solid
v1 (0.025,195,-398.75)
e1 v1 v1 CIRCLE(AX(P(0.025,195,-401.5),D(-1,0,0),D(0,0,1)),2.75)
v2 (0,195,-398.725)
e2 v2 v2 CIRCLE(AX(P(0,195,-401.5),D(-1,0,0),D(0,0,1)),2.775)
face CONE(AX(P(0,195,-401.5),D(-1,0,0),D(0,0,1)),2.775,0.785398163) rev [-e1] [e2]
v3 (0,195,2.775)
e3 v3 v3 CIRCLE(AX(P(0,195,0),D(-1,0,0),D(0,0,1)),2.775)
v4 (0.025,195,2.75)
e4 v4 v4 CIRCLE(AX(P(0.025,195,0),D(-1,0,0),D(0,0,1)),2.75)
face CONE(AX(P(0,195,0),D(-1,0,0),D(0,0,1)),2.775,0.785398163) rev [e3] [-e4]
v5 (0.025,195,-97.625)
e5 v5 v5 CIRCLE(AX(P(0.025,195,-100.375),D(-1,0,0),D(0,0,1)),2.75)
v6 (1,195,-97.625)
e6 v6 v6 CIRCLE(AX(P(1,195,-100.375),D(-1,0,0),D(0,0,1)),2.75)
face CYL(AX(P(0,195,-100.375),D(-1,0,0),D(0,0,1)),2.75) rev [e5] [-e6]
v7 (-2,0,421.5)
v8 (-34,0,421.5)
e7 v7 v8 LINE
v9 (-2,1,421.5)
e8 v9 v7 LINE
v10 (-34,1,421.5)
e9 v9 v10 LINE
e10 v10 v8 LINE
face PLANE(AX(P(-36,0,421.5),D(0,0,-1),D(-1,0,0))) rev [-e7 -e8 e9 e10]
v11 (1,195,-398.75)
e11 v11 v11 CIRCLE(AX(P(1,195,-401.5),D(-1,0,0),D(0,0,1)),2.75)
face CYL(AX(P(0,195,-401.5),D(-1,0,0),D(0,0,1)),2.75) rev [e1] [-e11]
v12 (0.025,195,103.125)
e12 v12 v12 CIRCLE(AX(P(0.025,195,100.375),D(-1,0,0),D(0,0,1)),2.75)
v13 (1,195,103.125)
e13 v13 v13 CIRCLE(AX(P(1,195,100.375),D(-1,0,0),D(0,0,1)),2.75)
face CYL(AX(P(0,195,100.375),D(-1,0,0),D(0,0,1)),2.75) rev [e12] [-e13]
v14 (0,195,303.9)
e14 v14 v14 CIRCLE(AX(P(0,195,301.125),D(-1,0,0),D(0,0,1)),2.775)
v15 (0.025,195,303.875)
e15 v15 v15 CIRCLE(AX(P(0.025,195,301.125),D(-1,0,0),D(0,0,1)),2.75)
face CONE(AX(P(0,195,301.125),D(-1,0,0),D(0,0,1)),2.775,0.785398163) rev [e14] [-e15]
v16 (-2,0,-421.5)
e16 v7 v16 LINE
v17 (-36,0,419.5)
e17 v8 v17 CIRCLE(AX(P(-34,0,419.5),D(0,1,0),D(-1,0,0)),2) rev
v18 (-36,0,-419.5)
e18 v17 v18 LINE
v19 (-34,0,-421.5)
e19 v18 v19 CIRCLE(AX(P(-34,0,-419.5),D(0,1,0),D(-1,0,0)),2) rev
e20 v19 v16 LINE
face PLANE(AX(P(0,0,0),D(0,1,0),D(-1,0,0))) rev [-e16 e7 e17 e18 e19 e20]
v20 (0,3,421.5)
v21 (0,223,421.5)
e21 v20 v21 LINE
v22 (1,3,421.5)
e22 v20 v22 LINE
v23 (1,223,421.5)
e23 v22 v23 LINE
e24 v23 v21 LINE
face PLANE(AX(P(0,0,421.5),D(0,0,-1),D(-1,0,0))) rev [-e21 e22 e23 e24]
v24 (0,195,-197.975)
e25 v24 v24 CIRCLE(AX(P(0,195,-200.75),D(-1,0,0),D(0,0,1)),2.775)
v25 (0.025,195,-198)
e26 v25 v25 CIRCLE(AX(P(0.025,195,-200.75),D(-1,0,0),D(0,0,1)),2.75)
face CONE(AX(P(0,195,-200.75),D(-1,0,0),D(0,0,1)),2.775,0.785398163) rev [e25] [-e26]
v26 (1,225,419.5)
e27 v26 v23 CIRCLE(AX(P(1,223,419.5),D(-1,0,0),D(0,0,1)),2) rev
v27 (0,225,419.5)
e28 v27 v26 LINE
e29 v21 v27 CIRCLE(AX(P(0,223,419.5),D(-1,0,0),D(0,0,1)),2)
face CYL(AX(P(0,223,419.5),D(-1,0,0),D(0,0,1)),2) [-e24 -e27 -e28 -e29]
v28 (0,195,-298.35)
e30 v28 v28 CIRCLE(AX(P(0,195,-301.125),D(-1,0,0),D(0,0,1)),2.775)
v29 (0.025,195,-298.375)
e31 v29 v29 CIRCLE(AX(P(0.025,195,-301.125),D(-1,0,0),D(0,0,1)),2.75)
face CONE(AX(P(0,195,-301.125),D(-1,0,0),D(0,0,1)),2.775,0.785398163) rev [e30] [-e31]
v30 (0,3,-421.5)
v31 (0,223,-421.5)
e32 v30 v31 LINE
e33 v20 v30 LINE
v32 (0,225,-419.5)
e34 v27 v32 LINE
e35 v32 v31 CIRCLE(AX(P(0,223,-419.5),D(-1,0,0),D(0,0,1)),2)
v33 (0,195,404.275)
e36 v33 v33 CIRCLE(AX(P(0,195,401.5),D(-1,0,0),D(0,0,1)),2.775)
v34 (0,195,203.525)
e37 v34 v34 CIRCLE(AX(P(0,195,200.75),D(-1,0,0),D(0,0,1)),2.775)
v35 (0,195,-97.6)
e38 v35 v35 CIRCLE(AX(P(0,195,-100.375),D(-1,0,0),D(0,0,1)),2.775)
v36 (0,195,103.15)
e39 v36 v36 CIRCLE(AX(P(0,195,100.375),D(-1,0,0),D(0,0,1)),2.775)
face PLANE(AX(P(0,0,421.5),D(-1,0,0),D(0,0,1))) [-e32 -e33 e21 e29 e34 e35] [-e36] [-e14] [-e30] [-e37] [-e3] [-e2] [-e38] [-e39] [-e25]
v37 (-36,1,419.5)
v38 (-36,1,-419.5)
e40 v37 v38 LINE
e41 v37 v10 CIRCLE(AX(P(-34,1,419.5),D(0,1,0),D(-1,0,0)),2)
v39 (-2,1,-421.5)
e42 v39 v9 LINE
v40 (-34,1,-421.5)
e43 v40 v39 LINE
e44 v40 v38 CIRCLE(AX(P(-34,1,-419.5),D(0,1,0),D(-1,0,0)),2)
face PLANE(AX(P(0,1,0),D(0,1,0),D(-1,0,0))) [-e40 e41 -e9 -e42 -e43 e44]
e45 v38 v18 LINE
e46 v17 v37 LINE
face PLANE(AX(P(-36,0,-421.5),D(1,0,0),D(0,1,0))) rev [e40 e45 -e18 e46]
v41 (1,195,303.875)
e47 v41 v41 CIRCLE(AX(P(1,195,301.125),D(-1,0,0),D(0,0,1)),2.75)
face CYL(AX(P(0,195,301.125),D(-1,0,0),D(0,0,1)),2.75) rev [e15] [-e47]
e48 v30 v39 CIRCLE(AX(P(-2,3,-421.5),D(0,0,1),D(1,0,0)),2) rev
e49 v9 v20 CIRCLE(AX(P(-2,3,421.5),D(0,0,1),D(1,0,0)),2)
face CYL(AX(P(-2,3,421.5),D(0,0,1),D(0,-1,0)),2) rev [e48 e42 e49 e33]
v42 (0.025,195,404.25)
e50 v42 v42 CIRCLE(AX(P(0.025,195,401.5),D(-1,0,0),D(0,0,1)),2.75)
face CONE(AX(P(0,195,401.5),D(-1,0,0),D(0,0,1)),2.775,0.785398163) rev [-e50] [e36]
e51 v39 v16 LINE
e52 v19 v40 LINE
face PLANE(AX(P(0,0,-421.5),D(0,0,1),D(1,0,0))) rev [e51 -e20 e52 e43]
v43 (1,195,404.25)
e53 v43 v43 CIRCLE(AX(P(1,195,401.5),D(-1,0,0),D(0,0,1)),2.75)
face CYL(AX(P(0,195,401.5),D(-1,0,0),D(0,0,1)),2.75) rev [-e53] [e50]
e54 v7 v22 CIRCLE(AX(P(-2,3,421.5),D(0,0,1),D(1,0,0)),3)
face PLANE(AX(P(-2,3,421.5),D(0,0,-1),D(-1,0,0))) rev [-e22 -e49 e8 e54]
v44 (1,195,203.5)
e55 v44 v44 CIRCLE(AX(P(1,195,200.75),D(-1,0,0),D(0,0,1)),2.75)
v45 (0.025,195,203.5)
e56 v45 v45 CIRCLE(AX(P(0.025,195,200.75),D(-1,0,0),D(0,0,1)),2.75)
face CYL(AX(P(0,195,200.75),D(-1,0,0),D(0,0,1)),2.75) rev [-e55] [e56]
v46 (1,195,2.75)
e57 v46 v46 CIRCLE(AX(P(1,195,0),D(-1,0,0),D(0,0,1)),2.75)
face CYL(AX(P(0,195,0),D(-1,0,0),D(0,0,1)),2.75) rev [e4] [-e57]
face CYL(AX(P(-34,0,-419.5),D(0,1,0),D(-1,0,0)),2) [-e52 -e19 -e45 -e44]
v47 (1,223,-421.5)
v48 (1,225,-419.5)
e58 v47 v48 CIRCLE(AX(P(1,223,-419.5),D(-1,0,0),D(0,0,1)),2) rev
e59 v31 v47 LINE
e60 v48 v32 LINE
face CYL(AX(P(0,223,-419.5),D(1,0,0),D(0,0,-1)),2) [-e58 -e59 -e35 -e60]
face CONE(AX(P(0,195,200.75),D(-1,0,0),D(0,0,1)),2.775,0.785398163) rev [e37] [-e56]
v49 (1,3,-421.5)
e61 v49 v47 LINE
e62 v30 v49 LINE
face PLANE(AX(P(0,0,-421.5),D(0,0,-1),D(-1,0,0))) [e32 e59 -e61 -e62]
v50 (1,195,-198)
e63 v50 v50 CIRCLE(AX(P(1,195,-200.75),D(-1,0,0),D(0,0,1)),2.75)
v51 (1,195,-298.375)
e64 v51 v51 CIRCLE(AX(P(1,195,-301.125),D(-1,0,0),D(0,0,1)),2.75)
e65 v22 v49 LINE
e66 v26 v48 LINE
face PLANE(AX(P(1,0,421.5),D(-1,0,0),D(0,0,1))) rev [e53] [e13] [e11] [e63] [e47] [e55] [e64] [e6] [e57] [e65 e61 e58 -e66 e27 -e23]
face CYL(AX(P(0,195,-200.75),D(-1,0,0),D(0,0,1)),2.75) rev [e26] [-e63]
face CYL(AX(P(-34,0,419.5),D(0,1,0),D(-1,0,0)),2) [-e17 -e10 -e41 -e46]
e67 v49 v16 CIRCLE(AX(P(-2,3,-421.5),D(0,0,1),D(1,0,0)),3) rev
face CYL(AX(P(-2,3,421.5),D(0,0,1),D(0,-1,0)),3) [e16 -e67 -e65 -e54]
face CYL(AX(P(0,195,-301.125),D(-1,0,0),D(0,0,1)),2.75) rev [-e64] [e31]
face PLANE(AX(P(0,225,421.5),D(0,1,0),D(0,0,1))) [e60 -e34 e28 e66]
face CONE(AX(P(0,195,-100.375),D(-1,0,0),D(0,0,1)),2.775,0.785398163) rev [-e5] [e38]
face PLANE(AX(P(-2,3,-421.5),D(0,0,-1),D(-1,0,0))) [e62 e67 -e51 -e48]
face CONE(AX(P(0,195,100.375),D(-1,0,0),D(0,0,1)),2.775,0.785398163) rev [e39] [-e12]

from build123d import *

# Parameters (mm, degrees)
SKETCH2_W                    = 1
SKETCH2_H                    = 225
BASE_FLANGE1_DEPTH           = 421.5
EDGE_FLANGE1_STRIP_W         = 8
EDGE_FLANGE1_STRIP_H         = 1
EDGE_FLANGE1_STRIP_CUT_DEPTH = 843
EDGE_FLANGE1_DEPTH           = 843
CRVPATTERN1_COUNT            = 9
CRVPATTERN1_PITCH            = 100.375
FILLET1_R                    = 2


# Sheet-metal steps are written as plain solids
with BuildPart() as part:
    # Sketch2 → Base-Flange1 (new, symmetric)
    with BuildSketch(Plane.XY):
        with Locations((0.5, 112.5)):
            Rectangle(SKETCH2_W, SKETCH2_H)
    extrude(amount=BASE_FLANGE1_DEPTH, both=True)

    # Edge-Flange1 strip (across the edge) → Edge-Flange1 strip cut (cut)
    with BuildSketch(Plane(origin=(0, 0, -421.5), x_dir=(0, 1, 0), z_dir=(0, 0, 1))):
        with Locations((-1, -0.5)):
            Rectangle(EDGE_FLANGE1_STRIP_W, EDGE_FLANGE1_STRIP_H)
    extrude(amount=EDGE_FLANGE1_STRIP_CUT_DEPTH, mode=Mode.SUBTRACT)

    # Edge-Flange1 section (across the edge) → Edge-Flange1 (add)
    with BuildSketch(Plane(origin=(0, 0, -421.5), x_dir=(0, 1, 0), z_dir=(0, 0, 1))):
        with BuildLine():
            Line((0, 2), (0, 36))
            Line((0, 36), (1, 36))
            Line((1, 36), (1, 2))
            ThreePointArc((1, 2), (1.585786438, 0.585786438), (3, 0))
            Line((3, 0), (3, -1))
            ThreePointArc((3, -1), (0.878679656, -0.121320344), (0, 2))
        make_face()
    extrude(amount=EDGE_FLANGE1_DEPTH)

    # Sketch8 → M5 Clearance Hole1 (revolve, cut)
    with BuildSketch(Plane(origin=(0, 195, -401.5), x_dir=(0, 0, 1), z_dir=(0, 1, 0))):
        Polygon((0, 0), (0, 1), (2.75, 1), (2.75, 0.025), (2.775, 0), align=None)
    m5_clearance_hole1 = revolve(axis=Axis((-6.35, 195, -401.5), (1, 0, 0)), mode=Mode.SUBTRACT)

    # CrvPattern1: M5 Clearance Hole1 ×9
    with Locations(*[(0, 0, i * CRVPATTERN1_PITCH) for i in range(1, CRVPATTERN1_COUNT)]):
        add(m5_clearance_hole1, mode=Mode.SUBTRACT)

    # Fillet1
    fillet1_edges = [part.edges().sort_by_distance(p)[0] for p in [
        (-36, 0.5, -421.5),
        (-36, 0.5, 421.5),
        (0.5, 225, -421.5),
        (0.5, 225, 421.5),
    ]]
    fillet(fillet1_edges, radius=FILLET1_R)


solid = part.part
